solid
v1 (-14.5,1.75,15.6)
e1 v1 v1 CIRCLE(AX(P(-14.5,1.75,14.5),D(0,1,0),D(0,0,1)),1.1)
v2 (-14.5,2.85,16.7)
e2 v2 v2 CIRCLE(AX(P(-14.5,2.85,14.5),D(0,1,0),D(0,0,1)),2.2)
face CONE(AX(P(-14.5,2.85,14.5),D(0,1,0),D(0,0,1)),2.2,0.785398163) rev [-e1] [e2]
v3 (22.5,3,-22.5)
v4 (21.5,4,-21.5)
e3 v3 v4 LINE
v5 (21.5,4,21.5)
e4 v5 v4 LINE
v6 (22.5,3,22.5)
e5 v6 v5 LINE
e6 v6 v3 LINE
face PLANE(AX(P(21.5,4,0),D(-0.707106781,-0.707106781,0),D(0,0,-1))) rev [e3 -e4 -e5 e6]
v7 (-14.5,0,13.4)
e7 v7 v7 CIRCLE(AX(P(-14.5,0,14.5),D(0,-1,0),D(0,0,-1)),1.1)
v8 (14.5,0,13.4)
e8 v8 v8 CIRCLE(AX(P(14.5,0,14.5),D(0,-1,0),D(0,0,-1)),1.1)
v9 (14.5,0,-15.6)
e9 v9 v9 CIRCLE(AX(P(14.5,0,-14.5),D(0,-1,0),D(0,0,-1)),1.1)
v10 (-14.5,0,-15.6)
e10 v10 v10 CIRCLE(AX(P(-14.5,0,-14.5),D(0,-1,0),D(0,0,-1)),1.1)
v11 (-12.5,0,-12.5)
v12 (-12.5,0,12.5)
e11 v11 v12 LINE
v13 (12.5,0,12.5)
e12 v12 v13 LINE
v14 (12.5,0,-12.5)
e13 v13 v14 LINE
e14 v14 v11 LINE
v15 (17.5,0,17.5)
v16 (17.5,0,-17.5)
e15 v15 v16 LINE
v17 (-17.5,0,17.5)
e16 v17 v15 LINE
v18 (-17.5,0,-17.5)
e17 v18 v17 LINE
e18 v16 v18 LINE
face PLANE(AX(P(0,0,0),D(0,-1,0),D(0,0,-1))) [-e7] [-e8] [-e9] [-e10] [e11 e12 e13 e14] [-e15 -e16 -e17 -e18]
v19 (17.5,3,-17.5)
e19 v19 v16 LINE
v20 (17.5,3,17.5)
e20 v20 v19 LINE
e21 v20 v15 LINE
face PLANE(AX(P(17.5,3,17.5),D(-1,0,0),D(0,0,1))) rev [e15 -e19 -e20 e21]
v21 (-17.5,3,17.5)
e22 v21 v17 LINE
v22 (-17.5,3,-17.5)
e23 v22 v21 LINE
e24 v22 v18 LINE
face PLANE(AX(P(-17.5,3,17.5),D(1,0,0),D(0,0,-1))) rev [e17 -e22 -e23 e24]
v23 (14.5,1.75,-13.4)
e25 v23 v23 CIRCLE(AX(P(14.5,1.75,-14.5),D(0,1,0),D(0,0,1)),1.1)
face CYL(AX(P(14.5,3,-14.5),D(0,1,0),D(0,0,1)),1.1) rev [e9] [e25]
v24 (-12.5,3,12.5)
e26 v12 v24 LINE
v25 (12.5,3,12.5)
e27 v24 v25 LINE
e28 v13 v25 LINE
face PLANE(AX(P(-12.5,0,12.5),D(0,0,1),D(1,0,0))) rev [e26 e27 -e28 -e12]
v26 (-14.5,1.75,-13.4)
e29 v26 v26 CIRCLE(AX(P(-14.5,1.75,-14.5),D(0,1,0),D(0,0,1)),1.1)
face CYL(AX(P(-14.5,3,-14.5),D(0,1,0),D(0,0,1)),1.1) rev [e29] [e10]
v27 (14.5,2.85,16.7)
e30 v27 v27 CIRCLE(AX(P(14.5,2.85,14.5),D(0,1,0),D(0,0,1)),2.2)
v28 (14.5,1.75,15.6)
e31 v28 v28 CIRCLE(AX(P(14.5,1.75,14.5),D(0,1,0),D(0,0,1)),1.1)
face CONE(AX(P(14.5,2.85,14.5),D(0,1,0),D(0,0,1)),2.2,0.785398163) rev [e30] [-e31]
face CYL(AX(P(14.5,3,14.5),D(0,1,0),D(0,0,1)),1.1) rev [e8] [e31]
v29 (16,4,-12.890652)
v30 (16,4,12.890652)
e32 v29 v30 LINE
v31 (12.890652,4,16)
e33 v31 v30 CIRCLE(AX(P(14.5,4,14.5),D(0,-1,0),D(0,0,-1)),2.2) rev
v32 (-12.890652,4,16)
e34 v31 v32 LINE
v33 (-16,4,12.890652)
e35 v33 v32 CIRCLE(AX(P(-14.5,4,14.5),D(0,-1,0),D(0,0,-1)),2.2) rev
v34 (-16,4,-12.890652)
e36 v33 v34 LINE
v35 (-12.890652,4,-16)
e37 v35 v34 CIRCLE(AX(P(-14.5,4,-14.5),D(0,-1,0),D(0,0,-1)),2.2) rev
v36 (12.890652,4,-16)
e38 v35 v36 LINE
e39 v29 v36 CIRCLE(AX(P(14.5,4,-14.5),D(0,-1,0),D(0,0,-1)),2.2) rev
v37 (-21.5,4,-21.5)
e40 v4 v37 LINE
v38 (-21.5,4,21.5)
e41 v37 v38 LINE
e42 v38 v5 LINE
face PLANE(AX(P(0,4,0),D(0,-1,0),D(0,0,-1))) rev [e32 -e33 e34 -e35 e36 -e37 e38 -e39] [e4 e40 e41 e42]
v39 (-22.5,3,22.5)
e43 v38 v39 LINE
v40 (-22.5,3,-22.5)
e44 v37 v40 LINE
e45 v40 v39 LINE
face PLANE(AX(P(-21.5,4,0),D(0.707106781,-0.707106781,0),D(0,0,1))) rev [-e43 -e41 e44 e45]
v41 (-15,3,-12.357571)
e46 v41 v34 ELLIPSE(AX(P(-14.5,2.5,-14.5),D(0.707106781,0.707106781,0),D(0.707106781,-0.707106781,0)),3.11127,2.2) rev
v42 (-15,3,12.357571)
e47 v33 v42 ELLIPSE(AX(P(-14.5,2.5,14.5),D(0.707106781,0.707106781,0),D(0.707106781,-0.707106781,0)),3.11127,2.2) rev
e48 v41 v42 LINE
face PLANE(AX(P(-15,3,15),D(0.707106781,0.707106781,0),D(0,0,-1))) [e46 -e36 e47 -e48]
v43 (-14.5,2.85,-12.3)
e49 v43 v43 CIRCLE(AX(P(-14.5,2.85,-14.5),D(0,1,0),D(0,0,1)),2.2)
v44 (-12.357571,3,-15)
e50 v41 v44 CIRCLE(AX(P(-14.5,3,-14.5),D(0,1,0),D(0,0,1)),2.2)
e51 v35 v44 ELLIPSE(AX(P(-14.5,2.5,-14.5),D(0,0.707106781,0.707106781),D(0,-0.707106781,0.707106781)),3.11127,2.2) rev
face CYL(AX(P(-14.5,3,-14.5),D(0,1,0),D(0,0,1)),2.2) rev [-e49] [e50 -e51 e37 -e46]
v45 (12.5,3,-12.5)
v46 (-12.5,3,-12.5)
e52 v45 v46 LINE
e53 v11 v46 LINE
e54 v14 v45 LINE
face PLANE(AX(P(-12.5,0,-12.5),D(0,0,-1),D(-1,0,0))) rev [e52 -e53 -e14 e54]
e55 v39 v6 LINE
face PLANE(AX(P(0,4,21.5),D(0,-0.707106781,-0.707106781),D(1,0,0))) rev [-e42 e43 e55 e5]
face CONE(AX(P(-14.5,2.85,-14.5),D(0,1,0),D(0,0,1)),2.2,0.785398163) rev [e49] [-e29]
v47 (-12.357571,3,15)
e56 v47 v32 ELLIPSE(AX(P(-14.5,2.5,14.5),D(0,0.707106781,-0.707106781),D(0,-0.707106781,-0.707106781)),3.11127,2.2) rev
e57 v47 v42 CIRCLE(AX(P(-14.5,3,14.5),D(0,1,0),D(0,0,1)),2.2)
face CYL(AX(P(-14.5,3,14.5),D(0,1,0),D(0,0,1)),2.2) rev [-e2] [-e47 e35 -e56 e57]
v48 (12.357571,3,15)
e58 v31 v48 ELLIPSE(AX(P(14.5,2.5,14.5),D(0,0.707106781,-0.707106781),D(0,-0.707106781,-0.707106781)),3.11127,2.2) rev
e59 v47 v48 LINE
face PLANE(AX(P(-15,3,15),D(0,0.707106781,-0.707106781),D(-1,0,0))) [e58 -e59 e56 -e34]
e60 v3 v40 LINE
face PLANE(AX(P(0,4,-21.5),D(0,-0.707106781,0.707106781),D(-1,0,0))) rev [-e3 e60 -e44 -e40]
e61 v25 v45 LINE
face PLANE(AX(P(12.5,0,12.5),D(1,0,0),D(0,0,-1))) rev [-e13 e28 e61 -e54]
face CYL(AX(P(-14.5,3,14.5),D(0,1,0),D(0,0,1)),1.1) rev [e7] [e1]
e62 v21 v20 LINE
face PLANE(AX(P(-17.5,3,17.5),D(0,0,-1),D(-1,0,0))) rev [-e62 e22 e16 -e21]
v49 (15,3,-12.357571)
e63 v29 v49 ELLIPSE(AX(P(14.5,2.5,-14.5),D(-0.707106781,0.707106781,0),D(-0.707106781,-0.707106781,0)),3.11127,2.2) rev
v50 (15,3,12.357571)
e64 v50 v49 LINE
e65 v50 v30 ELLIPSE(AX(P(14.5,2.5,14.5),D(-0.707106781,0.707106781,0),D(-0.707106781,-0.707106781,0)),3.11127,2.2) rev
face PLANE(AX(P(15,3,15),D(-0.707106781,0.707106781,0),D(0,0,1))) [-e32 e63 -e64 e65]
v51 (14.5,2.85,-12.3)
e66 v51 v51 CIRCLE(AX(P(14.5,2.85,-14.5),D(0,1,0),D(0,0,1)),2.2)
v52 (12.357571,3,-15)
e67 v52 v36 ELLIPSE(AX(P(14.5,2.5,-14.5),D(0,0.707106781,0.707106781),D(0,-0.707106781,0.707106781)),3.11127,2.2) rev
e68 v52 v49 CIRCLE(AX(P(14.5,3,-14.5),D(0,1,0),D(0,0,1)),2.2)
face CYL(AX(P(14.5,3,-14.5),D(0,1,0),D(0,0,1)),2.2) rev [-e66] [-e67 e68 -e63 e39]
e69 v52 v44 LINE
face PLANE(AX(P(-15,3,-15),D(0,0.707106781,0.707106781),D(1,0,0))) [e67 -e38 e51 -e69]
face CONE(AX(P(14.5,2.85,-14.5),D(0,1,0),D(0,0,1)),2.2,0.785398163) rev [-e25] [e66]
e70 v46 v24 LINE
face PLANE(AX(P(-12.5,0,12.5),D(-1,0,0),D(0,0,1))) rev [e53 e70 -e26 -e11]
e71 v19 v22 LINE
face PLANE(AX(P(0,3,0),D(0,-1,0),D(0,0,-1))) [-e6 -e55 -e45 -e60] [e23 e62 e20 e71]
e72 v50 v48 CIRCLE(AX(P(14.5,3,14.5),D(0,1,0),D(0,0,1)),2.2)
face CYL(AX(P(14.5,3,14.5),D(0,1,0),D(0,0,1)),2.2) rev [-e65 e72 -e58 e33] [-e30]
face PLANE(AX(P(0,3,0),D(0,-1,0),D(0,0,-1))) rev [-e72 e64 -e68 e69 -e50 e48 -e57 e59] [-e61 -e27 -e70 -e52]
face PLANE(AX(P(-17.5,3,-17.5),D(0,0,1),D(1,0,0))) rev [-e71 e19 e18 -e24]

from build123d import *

# Parameters (mm, degrees)
SKETCH1_W                                      = 35
SKETCH1_H                                      = 35
BOSS_EXTRUDE1_DEPTH                            = 3
SKETCH3_W                                      = 25
SKETCH3_H                                      = 25
CUT_EXTRUDE2_DEPTH                             = 25.929901725
SKETCH4_W                                      = 45
SKETCH4_H                                      = 45
SKETCH4_W_2                                    = 30
SKETCH4_H_2                                    = 30
BOSS_EXTRUDE2_DEPTH                            = 1
CHAMFER2_SIZE                                  = 1
CSK_FOR_M2_FLAT_HEAD_MACHINE_SCREW1_AT_2_COUNT = 2
CSK_FOR_M2_FLAT_HEAD_MACHINE_SCREW1_AT_2_PITCH = 29
CSK_FOR_M2_FLAT_HEAD_MACHINE_SCREW1_AT_3_COUNT = 2
CSK_FOR_M2_FLAT_HEAD_MACHINE_SCREW1_AT_3_PITCH = 41.012193309
CSK_FOR_M2_FLAT_HEAD_MACHINE_SCREW1_AT_4_COUNT = 2
CSK_FOR_M2_FLAT_HEAD_MACHINE_SCREW1_AT_4_PITCH = 29
CSK_FOR_M2_FLAT_HEAD_MACHINE_SCREW1_AT_5_COUNT = 2
CSK_FOR_M2_FLAT_HEAD_MACHINE_SCREW1_AT_5_PITCH = 20.506096654
CUT_EXTRUDE3_START                             = 10
SKETCH7_R                                      = 2.2
CUT_EXTRUDE3_DEPTH                             = 10


with BuildPart() as part:
    # Sketch1 → Boss-Extrude1 (new body)
    with BuildSketch(Plane(origin=(0, 0, 0), x_dir=(1, 0, 0), z_dir=(0, 1, 0))):
        Rectangle(SKETCH1_W, SKETCH1_H)
    extrude(amount=BOSS_EXTRUDE1_DEPTH)

    # Sketch3 → Cut-Extrude2 (cut, through all)
    with BuildSketch(Plane(origin=(0, 3, 0), x_dir=(1, 0, 0), z_dir=(0, 1, 0))):
        Rectangle(SKETCH3_W, SKETCH3_H)
    extrude(amount=-CUT_EXTRUDE2_DEPTH, mode=Mode.SUBTRACT)

    # Sketch4 → Boss-Extrude2 (add)
    with BuildSketch(Plane(origin=(0, 3, 0), x_dir=(1, 0, 0), z_dir=(0, 1, 0))):
        Rectangle(SKETCH4_W, SKETCH4_H)
        Rectangle(SKETCH4_W_2, SKETCH4_H_2, mode=Mode.SUBTRACT)
    extrude(amount=BOSS_EXTRUDE2_DEPTH)

    # Chamfer2
    chamfer2_edges = [part.edges().sort_by_distance(p)[0] for p in [
        (0, 4, -15),
        (-15, 4, 0),
        (0, 4, 15),
        (15, 4, 0),
        (0, 4, 22.5),
        (-22.5, 4, 0),
        (0, 4, -22.5),
        (22.5, 4, 0),
    ]]
    chamfer(chamfer2_edges, length=CHAMFER2_SIZE - 0.0001)  # a hair under: the kernel refuses the full size

    # Sketch5 → CSK for M2 Flat Head Machine Screw1 (revolve, cut)
    with BuildSketch(Plane(origin=(14.5, 3, -14.5), x_dir=(0, 0, 1), z_dir=(1, 0, 0))):
        Polygon((0, 0), (0, 20.660946681), (1.1, 20), (1.1, 1.25), (2.2, 0.15), (2.2, 0), align=None)
    csk_for_m2_flat_head_machine_screw1 = revolve(axis=Axis((14.5, 9.35, -14.5), (0, -1, 0)), mode=Mode.SUBTRACT)

    # CSK for M2 Flat Head Machine Screw1 at 2: CSK for M2 Flat Head Machine Screw1 ×2
    with Locations(*[(0, 0, i * CSK_FOR_M2_FLAT_HEAD_MACHINE_SCREW1_AT_2_PITCH) for i in range(1, CSK_FOR_M2_FLAT_HEAD_MACHINE_SCREW1_AT_2_COUNT)]):
        add(csk_for_m2_flat_head_machine_screw1, mode=Mode.SUBTRACT)

    # CSK for M2 Flat Head Machine Screw1 at 3: CSK for M2 Flat Head Machine Screw1 ×2
    with Locations(*[Vector(-0.70710678118655, 0, 0.7071067811865451) * (i * CSK_FOR_M2_FLAT_HEAD_MACHINE_SCREW1_AT_3_PITCH) for i in range(1, CSK_FOR_M2_FLAT_HEAD_MACHINE_SCREW1_AT_3_COUNT)]):
        add(csk_for_m2_flat_head_machine_screw1, mode=Mode.SUBTRACT)

    # CSK for M2 Flat Head Machine Screw1 at 4: CSK for M2 Flat Head Machine Screw1 ×2
    with Locations(*[(-i * CSK_FOR_M2_FLAT_HEAD_MACHINE_SCREW1_AT_4_PITCH, 0, 0) for i in range(1, CSK_FOR_M2_FLAT_HEAD_MACHINE_SCREW1_AT_4_COUNT)]):
        add(csk_for_m2_flat_head_machine_screw1, mode=Mode.SUBTRACT)

    # CSK for M2 Flat Head Machine Screw1 at 5: CSK for M2 Flat Head Machine Screw1 ×2
    with Locations(*[Vector(-0.7071067811865493, 0, 0.7071067811865457) * (i * CSK_FOR_M2_FLAT_HEAD_MACHINE_SCREW1_AT_5_PITCH) for i in range(1, CSK_FOR_M2_FLAT_HEAD_MACHINE_SCREW1_AT_5_COUNT)]):
        add(csk_for_m2_flat_head_machine_screw1, mode=Mode.SUBTRACT)

    # Sketch7 → Cut-Extrude3 (cut)
    with BuildSketch(Plane(origin=(0, 3, 0), x_dir=(1, 0, 0), z_dir=(0, 1, 0)).offset(CUT_EXTRUDE3_START)):
        with Locations(Location((14.5, 14.5, 0), (0, 0, 270))):
            Circle(SKETCH7_R)
        with Locations(Location((14.5, -14.5, 0), (0, 0, 270))):
            Circle(SKETCH7_R)
        with Locations(Location((-14.5, -14.5, 0), (0, 0, 270))):
            Circle(SKETCH7_R)
        with Locations(Location((-14.5, 14.5, 0), (0, 0, 270))):
            Circle(SKETCH7_R)
    extrude(amount=-CUT_EXTRUDE3_DEPTH, mode=Mode.SUBTRACT)


solid = part.part
